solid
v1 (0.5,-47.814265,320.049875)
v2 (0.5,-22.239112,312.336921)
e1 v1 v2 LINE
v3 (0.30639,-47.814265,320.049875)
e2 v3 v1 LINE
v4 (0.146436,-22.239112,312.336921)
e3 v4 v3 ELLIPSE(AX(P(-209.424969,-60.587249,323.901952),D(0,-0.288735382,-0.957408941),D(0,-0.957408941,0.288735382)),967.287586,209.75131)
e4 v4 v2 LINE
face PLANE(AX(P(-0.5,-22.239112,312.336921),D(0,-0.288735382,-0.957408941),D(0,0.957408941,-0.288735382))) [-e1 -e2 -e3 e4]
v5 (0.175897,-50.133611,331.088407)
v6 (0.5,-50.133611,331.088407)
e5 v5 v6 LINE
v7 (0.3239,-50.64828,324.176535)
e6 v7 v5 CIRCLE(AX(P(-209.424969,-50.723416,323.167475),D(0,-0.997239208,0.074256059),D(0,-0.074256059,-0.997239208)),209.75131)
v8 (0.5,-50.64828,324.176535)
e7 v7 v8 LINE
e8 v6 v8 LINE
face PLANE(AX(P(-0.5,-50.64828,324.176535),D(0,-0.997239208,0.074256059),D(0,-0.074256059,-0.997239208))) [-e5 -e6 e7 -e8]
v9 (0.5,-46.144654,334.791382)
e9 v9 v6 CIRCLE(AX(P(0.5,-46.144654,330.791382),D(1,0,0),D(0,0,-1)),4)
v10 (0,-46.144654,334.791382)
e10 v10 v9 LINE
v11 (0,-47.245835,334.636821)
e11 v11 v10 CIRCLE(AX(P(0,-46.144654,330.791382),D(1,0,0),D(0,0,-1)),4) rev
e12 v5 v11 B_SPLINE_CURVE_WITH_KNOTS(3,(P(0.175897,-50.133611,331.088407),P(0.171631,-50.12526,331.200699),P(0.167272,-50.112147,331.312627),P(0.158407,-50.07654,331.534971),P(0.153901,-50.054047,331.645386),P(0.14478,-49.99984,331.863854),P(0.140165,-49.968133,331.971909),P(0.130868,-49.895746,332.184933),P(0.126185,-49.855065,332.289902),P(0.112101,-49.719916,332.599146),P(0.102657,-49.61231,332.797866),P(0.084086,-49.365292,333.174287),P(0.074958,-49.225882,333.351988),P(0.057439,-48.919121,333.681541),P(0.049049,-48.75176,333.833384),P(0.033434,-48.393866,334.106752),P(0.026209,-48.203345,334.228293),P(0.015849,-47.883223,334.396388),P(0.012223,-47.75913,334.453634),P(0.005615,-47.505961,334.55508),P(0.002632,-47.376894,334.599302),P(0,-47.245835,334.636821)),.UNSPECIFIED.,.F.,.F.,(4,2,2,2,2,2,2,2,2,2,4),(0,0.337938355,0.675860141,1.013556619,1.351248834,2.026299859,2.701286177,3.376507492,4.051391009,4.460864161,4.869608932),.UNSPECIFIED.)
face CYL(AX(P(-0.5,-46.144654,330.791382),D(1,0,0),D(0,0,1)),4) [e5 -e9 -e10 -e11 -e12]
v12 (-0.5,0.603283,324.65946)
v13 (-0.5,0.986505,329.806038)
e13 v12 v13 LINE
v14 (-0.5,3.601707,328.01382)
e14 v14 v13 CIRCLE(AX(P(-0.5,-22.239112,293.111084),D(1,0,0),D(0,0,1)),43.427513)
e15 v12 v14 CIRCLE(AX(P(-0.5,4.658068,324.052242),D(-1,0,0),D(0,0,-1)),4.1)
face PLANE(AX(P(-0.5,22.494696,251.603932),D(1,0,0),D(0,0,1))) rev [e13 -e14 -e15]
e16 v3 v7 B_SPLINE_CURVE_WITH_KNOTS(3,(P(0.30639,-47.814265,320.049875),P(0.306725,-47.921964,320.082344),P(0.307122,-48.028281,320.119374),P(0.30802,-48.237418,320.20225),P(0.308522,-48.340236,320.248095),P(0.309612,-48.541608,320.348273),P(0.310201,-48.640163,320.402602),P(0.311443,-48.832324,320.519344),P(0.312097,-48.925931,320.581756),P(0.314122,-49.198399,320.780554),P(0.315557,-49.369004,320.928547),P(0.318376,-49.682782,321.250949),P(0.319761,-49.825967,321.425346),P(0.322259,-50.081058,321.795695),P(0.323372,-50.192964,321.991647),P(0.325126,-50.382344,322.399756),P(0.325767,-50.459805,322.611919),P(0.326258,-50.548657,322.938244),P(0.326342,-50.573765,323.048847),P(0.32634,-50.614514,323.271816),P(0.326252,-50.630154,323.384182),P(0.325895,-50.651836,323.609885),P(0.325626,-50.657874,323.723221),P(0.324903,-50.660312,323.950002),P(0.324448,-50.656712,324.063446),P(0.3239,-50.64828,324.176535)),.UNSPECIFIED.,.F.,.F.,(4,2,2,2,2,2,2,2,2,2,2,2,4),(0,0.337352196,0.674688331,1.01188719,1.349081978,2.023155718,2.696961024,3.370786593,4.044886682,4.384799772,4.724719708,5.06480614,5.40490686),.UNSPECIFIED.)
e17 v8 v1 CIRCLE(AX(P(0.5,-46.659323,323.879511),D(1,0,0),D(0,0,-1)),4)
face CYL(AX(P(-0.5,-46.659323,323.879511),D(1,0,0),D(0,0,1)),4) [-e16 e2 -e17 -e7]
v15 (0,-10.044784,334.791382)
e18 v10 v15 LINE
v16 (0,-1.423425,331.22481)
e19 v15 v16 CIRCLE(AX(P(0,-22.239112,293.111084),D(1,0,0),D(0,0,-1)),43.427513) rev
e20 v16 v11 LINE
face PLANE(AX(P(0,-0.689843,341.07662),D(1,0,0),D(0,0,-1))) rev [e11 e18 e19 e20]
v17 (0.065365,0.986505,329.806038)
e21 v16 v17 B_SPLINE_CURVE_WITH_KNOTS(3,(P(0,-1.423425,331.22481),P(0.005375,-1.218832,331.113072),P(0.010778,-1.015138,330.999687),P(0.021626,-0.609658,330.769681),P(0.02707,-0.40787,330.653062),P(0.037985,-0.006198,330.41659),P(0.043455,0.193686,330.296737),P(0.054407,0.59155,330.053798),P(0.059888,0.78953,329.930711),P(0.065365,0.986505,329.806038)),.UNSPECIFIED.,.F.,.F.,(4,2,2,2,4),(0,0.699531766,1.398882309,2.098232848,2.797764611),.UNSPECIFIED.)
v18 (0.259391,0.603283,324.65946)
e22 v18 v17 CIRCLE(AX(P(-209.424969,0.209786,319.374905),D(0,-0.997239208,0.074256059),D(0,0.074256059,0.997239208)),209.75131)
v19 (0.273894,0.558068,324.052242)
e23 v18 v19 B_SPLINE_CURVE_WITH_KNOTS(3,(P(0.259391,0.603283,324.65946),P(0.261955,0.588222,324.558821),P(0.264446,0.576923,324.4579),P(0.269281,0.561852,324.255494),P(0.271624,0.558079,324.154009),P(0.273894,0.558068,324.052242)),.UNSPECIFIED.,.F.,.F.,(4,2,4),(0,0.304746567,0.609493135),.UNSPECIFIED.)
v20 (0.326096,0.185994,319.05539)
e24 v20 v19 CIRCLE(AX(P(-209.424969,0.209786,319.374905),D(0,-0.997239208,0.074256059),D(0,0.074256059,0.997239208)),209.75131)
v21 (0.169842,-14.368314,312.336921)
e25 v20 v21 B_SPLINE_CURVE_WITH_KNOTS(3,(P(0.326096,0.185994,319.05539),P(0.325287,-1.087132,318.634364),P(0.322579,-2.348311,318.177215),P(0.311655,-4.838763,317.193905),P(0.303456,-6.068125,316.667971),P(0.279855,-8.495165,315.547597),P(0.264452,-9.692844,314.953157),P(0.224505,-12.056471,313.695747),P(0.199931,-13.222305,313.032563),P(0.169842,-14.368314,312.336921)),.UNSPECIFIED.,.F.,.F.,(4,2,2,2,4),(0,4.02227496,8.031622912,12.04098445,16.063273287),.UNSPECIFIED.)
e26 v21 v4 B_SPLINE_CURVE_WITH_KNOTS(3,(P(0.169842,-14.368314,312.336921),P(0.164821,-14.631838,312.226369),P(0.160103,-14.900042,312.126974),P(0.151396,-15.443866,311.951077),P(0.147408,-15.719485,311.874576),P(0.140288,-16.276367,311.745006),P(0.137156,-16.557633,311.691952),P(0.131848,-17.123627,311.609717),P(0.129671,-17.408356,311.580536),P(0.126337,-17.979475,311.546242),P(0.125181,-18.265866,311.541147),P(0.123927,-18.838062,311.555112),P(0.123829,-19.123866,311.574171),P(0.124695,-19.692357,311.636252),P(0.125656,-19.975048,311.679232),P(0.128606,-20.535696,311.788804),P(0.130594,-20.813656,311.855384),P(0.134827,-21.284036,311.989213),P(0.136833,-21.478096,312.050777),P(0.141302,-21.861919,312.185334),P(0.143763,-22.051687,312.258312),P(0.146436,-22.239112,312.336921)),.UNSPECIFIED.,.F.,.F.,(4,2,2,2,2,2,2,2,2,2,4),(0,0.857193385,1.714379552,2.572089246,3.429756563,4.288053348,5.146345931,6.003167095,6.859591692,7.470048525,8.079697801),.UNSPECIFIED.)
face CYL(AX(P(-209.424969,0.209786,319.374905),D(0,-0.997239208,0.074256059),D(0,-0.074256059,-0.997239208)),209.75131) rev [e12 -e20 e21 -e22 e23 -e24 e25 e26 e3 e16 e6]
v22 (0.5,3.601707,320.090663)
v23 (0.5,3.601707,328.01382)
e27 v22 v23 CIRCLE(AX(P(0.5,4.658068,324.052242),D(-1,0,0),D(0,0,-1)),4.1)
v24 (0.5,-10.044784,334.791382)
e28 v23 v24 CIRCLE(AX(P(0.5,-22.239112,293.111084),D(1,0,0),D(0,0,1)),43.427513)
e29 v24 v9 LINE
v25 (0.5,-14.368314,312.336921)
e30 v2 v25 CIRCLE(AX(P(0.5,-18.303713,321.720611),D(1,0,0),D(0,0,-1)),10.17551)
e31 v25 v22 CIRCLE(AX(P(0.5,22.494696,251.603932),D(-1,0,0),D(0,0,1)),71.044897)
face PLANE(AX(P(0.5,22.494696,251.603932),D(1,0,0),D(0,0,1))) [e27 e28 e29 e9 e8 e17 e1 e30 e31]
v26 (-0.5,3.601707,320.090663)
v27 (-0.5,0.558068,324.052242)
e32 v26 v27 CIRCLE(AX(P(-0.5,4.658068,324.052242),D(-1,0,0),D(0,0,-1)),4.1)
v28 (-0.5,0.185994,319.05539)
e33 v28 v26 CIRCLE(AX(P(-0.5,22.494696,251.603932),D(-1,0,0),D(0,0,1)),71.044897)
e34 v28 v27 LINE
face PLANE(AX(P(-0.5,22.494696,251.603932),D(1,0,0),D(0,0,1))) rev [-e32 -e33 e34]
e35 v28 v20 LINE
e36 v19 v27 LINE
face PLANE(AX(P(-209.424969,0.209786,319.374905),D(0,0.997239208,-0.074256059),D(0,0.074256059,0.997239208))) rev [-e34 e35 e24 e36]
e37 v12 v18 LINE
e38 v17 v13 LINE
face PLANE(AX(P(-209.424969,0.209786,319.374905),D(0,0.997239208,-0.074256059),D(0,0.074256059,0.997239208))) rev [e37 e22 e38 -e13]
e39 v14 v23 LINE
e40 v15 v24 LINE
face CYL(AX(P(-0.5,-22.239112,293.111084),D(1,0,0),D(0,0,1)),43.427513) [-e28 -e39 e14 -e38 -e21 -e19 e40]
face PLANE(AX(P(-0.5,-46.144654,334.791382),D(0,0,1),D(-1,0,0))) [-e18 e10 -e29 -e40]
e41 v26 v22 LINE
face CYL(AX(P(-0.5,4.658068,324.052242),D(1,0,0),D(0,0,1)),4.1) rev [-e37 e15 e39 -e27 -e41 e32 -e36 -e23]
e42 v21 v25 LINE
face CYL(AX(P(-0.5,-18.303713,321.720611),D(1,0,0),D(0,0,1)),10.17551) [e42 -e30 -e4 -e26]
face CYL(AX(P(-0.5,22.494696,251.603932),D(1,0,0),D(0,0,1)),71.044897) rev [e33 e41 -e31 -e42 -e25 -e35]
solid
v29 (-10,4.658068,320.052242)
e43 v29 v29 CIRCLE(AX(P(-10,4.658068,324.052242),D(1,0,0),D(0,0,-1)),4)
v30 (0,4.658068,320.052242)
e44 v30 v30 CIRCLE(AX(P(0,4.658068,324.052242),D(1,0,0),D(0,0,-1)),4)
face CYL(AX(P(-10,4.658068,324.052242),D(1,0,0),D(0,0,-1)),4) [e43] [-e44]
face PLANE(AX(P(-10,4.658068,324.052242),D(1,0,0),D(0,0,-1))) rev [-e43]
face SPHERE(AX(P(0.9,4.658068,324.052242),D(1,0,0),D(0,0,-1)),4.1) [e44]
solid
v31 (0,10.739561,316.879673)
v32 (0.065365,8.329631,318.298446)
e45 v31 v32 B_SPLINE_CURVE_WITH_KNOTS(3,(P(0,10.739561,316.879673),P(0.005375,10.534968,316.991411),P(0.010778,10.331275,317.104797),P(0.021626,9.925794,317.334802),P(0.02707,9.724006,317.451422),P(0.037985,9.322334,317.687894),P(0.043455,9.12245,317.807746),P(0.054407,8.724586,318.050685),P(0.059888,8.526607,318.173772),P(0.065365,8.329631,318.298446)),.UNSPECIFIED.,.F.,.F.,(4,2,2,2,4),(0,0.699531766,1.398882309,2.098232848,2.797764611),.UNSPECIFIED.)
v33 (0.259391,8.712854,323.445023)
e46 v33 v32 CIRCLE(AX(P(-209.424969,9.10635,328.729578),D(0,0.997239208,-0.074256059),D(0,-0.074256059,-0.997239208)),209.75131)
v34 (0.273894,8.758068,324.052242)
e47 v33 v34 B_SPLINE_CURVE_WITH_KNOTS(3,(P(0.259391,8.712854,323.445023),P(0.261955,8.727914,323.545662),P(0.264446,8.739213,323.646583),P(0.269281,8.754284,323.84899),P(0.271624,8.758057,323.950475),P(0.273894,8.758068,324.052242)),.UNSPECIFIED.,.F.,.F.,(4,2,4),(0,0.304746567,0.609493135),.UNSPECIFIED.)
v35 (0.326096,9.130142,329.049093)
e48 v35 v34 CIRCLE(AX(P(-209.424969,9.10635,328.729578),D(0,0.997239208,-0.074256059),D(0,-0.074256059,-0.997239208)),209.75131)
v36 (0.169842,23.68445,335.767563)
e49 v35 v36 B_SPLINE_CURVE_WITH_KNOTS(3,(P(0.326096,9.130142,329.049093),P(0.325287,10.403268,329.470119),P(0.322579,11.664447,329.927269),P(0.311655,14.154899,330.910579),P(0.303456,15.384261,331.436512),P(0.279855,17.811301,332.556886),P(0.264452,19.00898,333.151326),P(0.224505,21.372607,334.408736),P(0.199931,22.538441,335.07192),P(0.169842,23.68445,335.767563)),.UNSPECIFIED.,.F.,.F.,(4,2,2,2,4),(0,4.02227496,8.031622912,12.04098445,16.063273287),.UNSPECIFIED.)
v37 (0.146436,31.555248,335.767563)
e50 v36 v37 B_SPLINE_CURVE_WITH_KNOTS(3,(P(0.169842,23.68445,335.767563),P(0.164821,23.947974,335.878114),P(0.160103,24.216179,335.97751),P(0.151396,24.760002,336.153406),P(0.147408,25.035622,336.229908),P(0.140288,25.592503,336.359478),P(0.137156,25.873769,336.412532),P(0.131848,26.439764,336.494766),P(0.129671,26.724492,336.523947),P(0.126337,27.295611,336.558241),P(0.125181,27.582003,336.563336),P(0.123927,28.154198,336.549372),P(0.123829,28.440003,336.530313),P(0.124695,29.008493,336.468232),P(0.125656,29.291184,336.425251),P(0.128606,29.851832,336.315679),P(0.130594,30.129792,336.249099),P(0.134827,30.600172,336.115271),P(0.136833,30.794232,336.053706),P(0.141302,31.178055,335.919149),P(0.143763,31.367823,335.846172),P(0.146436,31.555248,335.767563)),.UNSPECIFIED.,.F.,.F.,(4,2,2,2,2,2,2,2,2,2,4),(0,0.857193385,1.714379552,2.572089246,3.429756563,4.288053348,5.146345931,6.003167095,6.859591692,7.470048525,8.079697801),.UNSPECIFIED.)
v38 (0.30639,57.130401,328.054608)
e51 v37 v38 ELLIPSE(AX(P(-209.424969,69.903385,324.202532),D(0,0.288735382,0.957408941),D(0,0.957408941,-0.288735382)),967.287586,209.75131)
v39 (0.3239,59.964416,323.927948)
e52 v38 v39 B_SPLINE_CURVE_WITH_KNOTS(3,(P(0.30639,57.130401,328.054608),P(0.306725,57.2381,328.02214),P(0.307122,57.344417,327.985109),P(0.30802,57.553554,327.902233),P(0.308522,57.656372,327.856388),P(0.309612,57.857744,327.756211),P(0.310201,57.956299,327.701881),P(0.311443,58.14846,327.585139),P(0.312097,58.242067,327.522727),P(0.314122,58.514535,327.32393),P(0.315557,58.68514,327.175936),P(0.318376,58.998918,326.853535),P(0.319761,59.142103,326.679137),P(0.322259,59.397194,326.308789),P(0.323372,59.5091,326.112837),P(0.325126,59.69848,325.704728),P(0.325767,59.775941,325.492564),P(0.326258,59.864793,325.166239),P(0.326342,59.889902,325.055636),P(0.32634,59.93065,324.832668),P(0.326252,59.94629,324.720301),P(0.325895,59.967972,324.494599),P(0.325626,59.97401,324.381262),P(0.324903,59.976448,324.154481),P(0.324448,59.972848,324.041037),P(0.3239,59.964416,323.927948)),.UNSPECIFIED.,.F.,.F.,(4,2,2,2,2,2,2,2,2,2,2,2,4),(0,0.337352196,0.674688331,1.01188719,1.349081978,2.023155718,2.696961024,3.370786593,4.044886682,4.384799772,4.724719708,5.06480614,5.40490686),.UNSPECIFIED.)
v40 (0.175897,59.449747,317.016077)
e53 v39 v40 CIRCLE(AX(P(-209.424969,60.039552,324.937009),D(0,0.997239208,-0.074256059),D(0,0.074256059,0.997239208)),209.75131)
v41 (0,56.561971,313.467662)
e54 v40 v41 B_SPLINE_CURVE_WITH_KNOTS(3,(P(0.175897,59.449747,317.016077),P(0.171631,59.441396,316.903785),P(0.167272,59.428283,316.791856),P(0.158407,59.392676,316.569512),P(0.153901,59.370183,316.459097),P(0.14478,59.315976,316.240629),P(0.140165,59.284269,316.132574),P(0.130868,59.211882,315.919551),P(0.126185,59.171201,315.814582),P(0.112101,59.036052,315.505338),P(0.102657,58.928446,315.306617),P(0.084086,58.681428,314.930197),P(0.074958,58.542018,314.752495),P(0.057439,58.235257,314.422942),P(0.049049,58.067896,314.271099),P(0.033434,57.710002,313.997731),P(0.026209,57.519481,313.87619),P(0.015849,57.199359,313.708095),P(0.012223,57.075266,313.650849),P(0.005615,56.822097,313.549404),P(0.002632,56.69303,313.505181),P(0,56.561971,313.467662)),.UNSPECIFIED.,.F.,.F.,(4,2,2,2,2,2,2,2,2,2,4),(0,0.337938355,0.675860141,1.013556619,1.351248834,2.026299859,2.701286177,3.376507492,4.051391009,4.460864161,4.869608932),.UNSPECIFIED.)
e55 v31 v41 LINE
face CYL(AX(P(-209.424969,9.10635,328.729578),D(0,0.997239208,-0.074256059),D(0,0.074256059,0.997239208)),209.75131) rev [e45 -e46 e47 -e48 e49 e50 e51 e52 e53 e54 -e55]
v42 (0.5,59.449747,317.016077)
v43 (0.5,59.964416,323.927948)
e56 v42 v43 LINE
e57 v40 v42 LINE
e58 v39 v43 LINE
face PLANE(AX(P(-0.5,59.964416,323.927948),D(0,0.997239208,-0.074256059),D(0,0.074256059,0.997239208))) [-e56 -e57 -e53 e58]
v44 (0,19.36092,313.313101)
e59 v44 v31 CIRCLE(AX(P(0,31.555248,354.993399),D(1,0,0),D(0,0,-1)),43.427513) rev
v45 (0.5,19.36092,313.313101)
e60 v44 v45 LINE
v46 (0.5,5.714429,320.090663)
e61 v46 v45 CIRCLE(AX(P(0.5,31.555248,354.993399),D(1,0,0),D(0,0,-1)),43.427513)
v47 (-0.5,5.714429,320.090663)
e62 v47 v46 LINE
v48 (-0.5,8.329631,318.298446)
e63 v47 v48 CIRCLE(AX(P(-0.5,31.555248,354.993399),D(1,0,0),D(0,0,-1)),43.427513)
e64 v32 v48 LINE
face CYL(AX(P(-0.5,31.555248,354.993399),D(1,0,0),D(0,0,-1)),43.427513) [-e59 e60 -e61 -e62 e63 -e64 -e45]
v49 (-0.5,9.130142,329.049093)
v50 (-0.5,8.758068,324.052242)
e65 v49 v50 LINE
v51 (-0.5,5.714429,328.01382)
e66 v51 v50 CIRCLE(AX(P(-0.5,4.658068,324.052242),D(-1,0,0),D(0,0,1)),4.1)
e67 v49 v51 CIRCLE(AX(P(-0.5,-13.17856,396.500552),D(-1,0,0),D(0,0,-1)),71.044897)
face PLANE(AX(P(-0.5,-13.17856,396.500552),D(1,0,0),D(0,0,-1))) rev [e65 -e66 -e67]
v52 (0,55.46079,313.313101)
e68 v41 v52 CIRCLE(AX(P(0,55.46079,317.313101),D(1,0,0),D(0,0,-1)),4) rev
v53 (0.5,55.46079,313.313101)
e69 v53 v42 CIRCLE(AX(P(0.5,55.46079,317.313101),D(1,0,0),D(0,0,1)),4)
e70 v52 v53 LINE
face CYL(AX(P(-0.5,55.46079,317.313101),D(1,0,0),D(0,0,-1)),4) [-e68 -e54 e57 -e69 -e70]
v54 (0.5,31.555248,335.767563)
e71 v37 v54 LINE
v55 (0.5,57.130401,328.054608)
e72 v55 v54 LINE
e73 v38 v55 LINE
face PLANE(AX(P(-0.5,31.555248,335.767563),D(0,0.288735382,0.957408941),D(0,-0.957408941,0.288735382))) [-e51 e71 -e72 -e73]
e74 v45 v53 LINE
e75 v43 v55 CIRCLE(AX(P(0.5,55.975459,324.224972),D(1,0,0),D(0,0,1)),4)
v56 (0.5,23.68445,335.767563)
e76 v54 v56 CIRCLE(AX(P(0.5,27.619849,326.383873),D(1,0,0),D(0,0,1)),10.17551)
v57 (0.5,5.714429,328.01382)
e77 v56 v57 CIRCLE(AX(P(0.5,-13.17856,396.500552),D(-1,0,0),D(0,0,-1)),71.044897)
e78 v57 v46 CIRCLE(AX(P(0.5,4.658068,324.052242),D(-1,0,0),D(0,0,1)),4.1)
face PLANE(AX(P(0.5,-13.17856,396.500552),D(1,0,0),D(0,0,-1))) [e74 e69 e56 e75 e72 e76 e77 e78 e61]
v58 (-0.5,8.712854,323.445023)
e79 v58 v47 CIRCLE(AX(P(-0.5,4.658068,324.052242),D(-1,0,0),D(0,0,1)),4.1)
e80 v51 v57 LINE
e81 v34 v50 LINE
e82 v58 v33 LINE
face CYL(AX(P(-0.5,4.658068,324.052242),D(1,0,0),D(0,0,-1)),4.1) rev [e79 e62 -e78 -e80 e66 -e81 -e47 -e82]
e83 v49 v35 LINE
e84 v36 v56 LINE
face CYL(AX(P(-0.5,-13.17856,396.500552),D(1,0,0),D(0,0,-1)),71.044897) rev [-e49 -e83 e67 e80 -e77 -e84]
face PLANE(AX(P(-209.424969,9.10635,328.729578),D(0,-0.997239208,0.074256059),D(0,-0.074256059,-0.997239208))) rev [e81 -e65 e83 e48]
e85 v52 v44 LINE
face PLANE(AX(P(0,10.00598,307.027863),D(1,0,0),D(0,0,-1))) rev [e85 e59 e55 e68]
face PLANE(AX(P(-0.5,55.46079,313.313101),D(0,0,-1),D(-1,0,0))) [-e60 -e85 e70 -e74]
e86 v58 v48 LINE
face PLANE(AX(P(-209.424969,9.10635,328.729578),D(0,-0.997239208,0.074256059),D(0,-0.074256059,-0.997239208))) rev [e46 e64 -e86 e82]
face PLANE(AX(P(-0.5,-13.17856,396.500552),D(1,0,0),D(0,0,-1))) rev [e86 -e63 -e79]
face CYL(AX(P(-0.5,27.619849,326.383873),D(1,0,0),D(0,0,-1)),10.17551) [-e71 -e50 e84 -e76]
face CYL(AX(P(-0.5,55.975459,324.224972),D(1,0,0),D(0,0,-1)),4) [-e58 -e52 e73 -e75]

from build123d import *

# Parameters (mm, degrees)
SKETCH2_R               = 4
BOSS_EXTRUDE1_DEPTH     = 10
BOSS_EXTRUDE2_DEPTH     = 0.5
CUT_EXTRUDE1_DEPTH      = 342.170230924
CUT_EXTRUDE1_DEPTH_BACK = 51.074207
CIRPATTERN4_COUNT       = 2
SKETCH6_W               = 0.5
SKETCH6_H               = 45.949265896
CUT_EXTRUDE2_DEPTH      = 78.646025062
SKETCH7_W               = 0.5
SKETCH7_H               = 45.949265896
CUT_EXTRUDE3_DEPTH      = 78.890144412


# Read off the part's stored shape, not the designer's step: Dome1
with BuildPart() as part:
    # Sketch2 → Boss-Extrude1 (new body)
    with BuildSketch(Plane(origin=(0, 0, 0), x_dir=(0, 0, -1), z_dir=(1, 0, 0))):
        with Locations((-324.05224168, 4.658068072)):
            Circle(SKETCH2_R)
    extrude(amount=-BOSS_EXTRUDE1_DEPTH)

    # Dome1 outline → Dome1 (revolve)
    with BuildSketch(Plane(origin=(0, 4.658068072, 324.05224168), x_dir=(0, 1, 0), z_dir=(0, 0, -1))):
        with BuildLine():
            Line((0, 0), (3.999999999, -2e-09))
            ThreePointArc((3.999999999, -2e-09), (3.201562119, 3.461249694), (0, 5))
            Line((0, 5), (0, 0))
        make_face()
    revolve(axis=Axis((0, 4.658068072, 324.05224168), (1, 0, 0)))


with BuildPart() as body_2:
    # Sketch4 → Boss-Extrude2 (new, symmetric)
    with BuildSketch(Plane(origin=(0, 0, 0), x_dir=(0, 0, -1), z_dir=(1, 0, 0))):
        with BuildLine():
            Line((-335.767562581, 31.555248006), (-328.054608207, 57.13040072))
            ThreePointArc((-328.054608207, 57.13040072), (-326.4894253, 59.272769198), (-323.927948207, 59.964416025))
            Line((-323.927948207, 59.964416025), (-317.016076638, 59.449746784))
            ThreePointArc((-317.016076638, 59.449746784), (-314.381540118, 58.182177747), (-313.313100875, 55.460789953))
            Line((-313.313100875, 55.460789953), (-313.313100875, 19.360920004))
            ThreePointArc((-313.313100875, 19.360920004), (-316.098708577, 12.238106754), (-320.090663433, 5.714428706))
            ThreePointArc((-320.090663433, 5.714428706), (-324.05224168, 8.758068072), (-328.013819928, 5.714428706))
            ThreePointArc((-328.013819928, 5.714428706), (-331.268929904, 14.967718201), (-335.767562581, 23.684449897))
            ThreePointArc((-335.767562581, 23.684449897), (-336.559382592, 27.619848952), (-335.767562581, 31.555248006))
        make_face()
    extrude(amount=BOSS_EXTRUDE2_DEPTH, both=True)

    # Sketch5 → Cut-Extrude1 (cut, two sides: drawn at the far end of the back side and taken through both)
    with BuildSketch(Plane(origin=(0, 35.646568561, -2.654301687), x_dir=(1, 0, 0), z_dir=(0, 0.9972392078358424, -0.07425605938199077)).offset(-CUT_EXTRUDE1_DEPTH_BACK)):
        with BuildLine():
            Line((0, -316.802311965), (-0.520390327, -316.802311965))
            Line((-0.520390327, -316.802311965), (-0.520390327, -340.19413973))
            Line((-0.520390327, -340.19413973), (0, -340.19413973))
            ThreePointArc((0, -340.19413973), (0.326340989, -328.498225847), (0, -316.802311965))
        make_face()
    extrude(amount=CUT_EXTRUDE1_DEPTH + CUT_EXTRUDE1_DEPTH_BACK, mode=Mode.SUBTRACT)


with BuildPart() as cirpattern4_1:
    # CirPattern4: pattern copy
    add(body_2.part.rotate(Axis((0, 4.658068072, 324.05224168), (1, 0, 0)), 1 * 360 / CIRPATTERN4_COUNT))

    # Sketch7 → Cut-Extrude3 (cut, through all)
    with BuildSketch(Plane(origin=(0, 24.519697522, 329.293042712), x_dir=(-1, 0, 0), z_dir=(0, -0.07425605938199076, -0.9972392078358424))):
        with Locations((0.25, -48.989577583)):
            Rectangle(SKETCH7_W, SKETCH7_H)
    extrude(amount=-CUT_EXTRUDE3_DEPTH, mode=Mode.SUBTRACT)


with BuildPart() as body_2_1:
    add(body_2.part)

    # Sketch6 → Cut-Extrude2 (cut, through all)
    with BuildSketch(Plane(origin=(0, 23.52449129, 315.927686624), x_dir=(1, 0, 0), z_dir=(0, 0.07425605938199076, 0.9972392078358424))):
        with Locations((-0.25, 10.15430881)):
            Rectangle(SKETCH6_W, SKETCH6_H)
    extrude(amount=-CUT_EXTRUDE2_DEPTH, mode=Mode.SUBTRACT)


solid = Compound([part.part, cirpattern4_1.part, body_2_1.part])
